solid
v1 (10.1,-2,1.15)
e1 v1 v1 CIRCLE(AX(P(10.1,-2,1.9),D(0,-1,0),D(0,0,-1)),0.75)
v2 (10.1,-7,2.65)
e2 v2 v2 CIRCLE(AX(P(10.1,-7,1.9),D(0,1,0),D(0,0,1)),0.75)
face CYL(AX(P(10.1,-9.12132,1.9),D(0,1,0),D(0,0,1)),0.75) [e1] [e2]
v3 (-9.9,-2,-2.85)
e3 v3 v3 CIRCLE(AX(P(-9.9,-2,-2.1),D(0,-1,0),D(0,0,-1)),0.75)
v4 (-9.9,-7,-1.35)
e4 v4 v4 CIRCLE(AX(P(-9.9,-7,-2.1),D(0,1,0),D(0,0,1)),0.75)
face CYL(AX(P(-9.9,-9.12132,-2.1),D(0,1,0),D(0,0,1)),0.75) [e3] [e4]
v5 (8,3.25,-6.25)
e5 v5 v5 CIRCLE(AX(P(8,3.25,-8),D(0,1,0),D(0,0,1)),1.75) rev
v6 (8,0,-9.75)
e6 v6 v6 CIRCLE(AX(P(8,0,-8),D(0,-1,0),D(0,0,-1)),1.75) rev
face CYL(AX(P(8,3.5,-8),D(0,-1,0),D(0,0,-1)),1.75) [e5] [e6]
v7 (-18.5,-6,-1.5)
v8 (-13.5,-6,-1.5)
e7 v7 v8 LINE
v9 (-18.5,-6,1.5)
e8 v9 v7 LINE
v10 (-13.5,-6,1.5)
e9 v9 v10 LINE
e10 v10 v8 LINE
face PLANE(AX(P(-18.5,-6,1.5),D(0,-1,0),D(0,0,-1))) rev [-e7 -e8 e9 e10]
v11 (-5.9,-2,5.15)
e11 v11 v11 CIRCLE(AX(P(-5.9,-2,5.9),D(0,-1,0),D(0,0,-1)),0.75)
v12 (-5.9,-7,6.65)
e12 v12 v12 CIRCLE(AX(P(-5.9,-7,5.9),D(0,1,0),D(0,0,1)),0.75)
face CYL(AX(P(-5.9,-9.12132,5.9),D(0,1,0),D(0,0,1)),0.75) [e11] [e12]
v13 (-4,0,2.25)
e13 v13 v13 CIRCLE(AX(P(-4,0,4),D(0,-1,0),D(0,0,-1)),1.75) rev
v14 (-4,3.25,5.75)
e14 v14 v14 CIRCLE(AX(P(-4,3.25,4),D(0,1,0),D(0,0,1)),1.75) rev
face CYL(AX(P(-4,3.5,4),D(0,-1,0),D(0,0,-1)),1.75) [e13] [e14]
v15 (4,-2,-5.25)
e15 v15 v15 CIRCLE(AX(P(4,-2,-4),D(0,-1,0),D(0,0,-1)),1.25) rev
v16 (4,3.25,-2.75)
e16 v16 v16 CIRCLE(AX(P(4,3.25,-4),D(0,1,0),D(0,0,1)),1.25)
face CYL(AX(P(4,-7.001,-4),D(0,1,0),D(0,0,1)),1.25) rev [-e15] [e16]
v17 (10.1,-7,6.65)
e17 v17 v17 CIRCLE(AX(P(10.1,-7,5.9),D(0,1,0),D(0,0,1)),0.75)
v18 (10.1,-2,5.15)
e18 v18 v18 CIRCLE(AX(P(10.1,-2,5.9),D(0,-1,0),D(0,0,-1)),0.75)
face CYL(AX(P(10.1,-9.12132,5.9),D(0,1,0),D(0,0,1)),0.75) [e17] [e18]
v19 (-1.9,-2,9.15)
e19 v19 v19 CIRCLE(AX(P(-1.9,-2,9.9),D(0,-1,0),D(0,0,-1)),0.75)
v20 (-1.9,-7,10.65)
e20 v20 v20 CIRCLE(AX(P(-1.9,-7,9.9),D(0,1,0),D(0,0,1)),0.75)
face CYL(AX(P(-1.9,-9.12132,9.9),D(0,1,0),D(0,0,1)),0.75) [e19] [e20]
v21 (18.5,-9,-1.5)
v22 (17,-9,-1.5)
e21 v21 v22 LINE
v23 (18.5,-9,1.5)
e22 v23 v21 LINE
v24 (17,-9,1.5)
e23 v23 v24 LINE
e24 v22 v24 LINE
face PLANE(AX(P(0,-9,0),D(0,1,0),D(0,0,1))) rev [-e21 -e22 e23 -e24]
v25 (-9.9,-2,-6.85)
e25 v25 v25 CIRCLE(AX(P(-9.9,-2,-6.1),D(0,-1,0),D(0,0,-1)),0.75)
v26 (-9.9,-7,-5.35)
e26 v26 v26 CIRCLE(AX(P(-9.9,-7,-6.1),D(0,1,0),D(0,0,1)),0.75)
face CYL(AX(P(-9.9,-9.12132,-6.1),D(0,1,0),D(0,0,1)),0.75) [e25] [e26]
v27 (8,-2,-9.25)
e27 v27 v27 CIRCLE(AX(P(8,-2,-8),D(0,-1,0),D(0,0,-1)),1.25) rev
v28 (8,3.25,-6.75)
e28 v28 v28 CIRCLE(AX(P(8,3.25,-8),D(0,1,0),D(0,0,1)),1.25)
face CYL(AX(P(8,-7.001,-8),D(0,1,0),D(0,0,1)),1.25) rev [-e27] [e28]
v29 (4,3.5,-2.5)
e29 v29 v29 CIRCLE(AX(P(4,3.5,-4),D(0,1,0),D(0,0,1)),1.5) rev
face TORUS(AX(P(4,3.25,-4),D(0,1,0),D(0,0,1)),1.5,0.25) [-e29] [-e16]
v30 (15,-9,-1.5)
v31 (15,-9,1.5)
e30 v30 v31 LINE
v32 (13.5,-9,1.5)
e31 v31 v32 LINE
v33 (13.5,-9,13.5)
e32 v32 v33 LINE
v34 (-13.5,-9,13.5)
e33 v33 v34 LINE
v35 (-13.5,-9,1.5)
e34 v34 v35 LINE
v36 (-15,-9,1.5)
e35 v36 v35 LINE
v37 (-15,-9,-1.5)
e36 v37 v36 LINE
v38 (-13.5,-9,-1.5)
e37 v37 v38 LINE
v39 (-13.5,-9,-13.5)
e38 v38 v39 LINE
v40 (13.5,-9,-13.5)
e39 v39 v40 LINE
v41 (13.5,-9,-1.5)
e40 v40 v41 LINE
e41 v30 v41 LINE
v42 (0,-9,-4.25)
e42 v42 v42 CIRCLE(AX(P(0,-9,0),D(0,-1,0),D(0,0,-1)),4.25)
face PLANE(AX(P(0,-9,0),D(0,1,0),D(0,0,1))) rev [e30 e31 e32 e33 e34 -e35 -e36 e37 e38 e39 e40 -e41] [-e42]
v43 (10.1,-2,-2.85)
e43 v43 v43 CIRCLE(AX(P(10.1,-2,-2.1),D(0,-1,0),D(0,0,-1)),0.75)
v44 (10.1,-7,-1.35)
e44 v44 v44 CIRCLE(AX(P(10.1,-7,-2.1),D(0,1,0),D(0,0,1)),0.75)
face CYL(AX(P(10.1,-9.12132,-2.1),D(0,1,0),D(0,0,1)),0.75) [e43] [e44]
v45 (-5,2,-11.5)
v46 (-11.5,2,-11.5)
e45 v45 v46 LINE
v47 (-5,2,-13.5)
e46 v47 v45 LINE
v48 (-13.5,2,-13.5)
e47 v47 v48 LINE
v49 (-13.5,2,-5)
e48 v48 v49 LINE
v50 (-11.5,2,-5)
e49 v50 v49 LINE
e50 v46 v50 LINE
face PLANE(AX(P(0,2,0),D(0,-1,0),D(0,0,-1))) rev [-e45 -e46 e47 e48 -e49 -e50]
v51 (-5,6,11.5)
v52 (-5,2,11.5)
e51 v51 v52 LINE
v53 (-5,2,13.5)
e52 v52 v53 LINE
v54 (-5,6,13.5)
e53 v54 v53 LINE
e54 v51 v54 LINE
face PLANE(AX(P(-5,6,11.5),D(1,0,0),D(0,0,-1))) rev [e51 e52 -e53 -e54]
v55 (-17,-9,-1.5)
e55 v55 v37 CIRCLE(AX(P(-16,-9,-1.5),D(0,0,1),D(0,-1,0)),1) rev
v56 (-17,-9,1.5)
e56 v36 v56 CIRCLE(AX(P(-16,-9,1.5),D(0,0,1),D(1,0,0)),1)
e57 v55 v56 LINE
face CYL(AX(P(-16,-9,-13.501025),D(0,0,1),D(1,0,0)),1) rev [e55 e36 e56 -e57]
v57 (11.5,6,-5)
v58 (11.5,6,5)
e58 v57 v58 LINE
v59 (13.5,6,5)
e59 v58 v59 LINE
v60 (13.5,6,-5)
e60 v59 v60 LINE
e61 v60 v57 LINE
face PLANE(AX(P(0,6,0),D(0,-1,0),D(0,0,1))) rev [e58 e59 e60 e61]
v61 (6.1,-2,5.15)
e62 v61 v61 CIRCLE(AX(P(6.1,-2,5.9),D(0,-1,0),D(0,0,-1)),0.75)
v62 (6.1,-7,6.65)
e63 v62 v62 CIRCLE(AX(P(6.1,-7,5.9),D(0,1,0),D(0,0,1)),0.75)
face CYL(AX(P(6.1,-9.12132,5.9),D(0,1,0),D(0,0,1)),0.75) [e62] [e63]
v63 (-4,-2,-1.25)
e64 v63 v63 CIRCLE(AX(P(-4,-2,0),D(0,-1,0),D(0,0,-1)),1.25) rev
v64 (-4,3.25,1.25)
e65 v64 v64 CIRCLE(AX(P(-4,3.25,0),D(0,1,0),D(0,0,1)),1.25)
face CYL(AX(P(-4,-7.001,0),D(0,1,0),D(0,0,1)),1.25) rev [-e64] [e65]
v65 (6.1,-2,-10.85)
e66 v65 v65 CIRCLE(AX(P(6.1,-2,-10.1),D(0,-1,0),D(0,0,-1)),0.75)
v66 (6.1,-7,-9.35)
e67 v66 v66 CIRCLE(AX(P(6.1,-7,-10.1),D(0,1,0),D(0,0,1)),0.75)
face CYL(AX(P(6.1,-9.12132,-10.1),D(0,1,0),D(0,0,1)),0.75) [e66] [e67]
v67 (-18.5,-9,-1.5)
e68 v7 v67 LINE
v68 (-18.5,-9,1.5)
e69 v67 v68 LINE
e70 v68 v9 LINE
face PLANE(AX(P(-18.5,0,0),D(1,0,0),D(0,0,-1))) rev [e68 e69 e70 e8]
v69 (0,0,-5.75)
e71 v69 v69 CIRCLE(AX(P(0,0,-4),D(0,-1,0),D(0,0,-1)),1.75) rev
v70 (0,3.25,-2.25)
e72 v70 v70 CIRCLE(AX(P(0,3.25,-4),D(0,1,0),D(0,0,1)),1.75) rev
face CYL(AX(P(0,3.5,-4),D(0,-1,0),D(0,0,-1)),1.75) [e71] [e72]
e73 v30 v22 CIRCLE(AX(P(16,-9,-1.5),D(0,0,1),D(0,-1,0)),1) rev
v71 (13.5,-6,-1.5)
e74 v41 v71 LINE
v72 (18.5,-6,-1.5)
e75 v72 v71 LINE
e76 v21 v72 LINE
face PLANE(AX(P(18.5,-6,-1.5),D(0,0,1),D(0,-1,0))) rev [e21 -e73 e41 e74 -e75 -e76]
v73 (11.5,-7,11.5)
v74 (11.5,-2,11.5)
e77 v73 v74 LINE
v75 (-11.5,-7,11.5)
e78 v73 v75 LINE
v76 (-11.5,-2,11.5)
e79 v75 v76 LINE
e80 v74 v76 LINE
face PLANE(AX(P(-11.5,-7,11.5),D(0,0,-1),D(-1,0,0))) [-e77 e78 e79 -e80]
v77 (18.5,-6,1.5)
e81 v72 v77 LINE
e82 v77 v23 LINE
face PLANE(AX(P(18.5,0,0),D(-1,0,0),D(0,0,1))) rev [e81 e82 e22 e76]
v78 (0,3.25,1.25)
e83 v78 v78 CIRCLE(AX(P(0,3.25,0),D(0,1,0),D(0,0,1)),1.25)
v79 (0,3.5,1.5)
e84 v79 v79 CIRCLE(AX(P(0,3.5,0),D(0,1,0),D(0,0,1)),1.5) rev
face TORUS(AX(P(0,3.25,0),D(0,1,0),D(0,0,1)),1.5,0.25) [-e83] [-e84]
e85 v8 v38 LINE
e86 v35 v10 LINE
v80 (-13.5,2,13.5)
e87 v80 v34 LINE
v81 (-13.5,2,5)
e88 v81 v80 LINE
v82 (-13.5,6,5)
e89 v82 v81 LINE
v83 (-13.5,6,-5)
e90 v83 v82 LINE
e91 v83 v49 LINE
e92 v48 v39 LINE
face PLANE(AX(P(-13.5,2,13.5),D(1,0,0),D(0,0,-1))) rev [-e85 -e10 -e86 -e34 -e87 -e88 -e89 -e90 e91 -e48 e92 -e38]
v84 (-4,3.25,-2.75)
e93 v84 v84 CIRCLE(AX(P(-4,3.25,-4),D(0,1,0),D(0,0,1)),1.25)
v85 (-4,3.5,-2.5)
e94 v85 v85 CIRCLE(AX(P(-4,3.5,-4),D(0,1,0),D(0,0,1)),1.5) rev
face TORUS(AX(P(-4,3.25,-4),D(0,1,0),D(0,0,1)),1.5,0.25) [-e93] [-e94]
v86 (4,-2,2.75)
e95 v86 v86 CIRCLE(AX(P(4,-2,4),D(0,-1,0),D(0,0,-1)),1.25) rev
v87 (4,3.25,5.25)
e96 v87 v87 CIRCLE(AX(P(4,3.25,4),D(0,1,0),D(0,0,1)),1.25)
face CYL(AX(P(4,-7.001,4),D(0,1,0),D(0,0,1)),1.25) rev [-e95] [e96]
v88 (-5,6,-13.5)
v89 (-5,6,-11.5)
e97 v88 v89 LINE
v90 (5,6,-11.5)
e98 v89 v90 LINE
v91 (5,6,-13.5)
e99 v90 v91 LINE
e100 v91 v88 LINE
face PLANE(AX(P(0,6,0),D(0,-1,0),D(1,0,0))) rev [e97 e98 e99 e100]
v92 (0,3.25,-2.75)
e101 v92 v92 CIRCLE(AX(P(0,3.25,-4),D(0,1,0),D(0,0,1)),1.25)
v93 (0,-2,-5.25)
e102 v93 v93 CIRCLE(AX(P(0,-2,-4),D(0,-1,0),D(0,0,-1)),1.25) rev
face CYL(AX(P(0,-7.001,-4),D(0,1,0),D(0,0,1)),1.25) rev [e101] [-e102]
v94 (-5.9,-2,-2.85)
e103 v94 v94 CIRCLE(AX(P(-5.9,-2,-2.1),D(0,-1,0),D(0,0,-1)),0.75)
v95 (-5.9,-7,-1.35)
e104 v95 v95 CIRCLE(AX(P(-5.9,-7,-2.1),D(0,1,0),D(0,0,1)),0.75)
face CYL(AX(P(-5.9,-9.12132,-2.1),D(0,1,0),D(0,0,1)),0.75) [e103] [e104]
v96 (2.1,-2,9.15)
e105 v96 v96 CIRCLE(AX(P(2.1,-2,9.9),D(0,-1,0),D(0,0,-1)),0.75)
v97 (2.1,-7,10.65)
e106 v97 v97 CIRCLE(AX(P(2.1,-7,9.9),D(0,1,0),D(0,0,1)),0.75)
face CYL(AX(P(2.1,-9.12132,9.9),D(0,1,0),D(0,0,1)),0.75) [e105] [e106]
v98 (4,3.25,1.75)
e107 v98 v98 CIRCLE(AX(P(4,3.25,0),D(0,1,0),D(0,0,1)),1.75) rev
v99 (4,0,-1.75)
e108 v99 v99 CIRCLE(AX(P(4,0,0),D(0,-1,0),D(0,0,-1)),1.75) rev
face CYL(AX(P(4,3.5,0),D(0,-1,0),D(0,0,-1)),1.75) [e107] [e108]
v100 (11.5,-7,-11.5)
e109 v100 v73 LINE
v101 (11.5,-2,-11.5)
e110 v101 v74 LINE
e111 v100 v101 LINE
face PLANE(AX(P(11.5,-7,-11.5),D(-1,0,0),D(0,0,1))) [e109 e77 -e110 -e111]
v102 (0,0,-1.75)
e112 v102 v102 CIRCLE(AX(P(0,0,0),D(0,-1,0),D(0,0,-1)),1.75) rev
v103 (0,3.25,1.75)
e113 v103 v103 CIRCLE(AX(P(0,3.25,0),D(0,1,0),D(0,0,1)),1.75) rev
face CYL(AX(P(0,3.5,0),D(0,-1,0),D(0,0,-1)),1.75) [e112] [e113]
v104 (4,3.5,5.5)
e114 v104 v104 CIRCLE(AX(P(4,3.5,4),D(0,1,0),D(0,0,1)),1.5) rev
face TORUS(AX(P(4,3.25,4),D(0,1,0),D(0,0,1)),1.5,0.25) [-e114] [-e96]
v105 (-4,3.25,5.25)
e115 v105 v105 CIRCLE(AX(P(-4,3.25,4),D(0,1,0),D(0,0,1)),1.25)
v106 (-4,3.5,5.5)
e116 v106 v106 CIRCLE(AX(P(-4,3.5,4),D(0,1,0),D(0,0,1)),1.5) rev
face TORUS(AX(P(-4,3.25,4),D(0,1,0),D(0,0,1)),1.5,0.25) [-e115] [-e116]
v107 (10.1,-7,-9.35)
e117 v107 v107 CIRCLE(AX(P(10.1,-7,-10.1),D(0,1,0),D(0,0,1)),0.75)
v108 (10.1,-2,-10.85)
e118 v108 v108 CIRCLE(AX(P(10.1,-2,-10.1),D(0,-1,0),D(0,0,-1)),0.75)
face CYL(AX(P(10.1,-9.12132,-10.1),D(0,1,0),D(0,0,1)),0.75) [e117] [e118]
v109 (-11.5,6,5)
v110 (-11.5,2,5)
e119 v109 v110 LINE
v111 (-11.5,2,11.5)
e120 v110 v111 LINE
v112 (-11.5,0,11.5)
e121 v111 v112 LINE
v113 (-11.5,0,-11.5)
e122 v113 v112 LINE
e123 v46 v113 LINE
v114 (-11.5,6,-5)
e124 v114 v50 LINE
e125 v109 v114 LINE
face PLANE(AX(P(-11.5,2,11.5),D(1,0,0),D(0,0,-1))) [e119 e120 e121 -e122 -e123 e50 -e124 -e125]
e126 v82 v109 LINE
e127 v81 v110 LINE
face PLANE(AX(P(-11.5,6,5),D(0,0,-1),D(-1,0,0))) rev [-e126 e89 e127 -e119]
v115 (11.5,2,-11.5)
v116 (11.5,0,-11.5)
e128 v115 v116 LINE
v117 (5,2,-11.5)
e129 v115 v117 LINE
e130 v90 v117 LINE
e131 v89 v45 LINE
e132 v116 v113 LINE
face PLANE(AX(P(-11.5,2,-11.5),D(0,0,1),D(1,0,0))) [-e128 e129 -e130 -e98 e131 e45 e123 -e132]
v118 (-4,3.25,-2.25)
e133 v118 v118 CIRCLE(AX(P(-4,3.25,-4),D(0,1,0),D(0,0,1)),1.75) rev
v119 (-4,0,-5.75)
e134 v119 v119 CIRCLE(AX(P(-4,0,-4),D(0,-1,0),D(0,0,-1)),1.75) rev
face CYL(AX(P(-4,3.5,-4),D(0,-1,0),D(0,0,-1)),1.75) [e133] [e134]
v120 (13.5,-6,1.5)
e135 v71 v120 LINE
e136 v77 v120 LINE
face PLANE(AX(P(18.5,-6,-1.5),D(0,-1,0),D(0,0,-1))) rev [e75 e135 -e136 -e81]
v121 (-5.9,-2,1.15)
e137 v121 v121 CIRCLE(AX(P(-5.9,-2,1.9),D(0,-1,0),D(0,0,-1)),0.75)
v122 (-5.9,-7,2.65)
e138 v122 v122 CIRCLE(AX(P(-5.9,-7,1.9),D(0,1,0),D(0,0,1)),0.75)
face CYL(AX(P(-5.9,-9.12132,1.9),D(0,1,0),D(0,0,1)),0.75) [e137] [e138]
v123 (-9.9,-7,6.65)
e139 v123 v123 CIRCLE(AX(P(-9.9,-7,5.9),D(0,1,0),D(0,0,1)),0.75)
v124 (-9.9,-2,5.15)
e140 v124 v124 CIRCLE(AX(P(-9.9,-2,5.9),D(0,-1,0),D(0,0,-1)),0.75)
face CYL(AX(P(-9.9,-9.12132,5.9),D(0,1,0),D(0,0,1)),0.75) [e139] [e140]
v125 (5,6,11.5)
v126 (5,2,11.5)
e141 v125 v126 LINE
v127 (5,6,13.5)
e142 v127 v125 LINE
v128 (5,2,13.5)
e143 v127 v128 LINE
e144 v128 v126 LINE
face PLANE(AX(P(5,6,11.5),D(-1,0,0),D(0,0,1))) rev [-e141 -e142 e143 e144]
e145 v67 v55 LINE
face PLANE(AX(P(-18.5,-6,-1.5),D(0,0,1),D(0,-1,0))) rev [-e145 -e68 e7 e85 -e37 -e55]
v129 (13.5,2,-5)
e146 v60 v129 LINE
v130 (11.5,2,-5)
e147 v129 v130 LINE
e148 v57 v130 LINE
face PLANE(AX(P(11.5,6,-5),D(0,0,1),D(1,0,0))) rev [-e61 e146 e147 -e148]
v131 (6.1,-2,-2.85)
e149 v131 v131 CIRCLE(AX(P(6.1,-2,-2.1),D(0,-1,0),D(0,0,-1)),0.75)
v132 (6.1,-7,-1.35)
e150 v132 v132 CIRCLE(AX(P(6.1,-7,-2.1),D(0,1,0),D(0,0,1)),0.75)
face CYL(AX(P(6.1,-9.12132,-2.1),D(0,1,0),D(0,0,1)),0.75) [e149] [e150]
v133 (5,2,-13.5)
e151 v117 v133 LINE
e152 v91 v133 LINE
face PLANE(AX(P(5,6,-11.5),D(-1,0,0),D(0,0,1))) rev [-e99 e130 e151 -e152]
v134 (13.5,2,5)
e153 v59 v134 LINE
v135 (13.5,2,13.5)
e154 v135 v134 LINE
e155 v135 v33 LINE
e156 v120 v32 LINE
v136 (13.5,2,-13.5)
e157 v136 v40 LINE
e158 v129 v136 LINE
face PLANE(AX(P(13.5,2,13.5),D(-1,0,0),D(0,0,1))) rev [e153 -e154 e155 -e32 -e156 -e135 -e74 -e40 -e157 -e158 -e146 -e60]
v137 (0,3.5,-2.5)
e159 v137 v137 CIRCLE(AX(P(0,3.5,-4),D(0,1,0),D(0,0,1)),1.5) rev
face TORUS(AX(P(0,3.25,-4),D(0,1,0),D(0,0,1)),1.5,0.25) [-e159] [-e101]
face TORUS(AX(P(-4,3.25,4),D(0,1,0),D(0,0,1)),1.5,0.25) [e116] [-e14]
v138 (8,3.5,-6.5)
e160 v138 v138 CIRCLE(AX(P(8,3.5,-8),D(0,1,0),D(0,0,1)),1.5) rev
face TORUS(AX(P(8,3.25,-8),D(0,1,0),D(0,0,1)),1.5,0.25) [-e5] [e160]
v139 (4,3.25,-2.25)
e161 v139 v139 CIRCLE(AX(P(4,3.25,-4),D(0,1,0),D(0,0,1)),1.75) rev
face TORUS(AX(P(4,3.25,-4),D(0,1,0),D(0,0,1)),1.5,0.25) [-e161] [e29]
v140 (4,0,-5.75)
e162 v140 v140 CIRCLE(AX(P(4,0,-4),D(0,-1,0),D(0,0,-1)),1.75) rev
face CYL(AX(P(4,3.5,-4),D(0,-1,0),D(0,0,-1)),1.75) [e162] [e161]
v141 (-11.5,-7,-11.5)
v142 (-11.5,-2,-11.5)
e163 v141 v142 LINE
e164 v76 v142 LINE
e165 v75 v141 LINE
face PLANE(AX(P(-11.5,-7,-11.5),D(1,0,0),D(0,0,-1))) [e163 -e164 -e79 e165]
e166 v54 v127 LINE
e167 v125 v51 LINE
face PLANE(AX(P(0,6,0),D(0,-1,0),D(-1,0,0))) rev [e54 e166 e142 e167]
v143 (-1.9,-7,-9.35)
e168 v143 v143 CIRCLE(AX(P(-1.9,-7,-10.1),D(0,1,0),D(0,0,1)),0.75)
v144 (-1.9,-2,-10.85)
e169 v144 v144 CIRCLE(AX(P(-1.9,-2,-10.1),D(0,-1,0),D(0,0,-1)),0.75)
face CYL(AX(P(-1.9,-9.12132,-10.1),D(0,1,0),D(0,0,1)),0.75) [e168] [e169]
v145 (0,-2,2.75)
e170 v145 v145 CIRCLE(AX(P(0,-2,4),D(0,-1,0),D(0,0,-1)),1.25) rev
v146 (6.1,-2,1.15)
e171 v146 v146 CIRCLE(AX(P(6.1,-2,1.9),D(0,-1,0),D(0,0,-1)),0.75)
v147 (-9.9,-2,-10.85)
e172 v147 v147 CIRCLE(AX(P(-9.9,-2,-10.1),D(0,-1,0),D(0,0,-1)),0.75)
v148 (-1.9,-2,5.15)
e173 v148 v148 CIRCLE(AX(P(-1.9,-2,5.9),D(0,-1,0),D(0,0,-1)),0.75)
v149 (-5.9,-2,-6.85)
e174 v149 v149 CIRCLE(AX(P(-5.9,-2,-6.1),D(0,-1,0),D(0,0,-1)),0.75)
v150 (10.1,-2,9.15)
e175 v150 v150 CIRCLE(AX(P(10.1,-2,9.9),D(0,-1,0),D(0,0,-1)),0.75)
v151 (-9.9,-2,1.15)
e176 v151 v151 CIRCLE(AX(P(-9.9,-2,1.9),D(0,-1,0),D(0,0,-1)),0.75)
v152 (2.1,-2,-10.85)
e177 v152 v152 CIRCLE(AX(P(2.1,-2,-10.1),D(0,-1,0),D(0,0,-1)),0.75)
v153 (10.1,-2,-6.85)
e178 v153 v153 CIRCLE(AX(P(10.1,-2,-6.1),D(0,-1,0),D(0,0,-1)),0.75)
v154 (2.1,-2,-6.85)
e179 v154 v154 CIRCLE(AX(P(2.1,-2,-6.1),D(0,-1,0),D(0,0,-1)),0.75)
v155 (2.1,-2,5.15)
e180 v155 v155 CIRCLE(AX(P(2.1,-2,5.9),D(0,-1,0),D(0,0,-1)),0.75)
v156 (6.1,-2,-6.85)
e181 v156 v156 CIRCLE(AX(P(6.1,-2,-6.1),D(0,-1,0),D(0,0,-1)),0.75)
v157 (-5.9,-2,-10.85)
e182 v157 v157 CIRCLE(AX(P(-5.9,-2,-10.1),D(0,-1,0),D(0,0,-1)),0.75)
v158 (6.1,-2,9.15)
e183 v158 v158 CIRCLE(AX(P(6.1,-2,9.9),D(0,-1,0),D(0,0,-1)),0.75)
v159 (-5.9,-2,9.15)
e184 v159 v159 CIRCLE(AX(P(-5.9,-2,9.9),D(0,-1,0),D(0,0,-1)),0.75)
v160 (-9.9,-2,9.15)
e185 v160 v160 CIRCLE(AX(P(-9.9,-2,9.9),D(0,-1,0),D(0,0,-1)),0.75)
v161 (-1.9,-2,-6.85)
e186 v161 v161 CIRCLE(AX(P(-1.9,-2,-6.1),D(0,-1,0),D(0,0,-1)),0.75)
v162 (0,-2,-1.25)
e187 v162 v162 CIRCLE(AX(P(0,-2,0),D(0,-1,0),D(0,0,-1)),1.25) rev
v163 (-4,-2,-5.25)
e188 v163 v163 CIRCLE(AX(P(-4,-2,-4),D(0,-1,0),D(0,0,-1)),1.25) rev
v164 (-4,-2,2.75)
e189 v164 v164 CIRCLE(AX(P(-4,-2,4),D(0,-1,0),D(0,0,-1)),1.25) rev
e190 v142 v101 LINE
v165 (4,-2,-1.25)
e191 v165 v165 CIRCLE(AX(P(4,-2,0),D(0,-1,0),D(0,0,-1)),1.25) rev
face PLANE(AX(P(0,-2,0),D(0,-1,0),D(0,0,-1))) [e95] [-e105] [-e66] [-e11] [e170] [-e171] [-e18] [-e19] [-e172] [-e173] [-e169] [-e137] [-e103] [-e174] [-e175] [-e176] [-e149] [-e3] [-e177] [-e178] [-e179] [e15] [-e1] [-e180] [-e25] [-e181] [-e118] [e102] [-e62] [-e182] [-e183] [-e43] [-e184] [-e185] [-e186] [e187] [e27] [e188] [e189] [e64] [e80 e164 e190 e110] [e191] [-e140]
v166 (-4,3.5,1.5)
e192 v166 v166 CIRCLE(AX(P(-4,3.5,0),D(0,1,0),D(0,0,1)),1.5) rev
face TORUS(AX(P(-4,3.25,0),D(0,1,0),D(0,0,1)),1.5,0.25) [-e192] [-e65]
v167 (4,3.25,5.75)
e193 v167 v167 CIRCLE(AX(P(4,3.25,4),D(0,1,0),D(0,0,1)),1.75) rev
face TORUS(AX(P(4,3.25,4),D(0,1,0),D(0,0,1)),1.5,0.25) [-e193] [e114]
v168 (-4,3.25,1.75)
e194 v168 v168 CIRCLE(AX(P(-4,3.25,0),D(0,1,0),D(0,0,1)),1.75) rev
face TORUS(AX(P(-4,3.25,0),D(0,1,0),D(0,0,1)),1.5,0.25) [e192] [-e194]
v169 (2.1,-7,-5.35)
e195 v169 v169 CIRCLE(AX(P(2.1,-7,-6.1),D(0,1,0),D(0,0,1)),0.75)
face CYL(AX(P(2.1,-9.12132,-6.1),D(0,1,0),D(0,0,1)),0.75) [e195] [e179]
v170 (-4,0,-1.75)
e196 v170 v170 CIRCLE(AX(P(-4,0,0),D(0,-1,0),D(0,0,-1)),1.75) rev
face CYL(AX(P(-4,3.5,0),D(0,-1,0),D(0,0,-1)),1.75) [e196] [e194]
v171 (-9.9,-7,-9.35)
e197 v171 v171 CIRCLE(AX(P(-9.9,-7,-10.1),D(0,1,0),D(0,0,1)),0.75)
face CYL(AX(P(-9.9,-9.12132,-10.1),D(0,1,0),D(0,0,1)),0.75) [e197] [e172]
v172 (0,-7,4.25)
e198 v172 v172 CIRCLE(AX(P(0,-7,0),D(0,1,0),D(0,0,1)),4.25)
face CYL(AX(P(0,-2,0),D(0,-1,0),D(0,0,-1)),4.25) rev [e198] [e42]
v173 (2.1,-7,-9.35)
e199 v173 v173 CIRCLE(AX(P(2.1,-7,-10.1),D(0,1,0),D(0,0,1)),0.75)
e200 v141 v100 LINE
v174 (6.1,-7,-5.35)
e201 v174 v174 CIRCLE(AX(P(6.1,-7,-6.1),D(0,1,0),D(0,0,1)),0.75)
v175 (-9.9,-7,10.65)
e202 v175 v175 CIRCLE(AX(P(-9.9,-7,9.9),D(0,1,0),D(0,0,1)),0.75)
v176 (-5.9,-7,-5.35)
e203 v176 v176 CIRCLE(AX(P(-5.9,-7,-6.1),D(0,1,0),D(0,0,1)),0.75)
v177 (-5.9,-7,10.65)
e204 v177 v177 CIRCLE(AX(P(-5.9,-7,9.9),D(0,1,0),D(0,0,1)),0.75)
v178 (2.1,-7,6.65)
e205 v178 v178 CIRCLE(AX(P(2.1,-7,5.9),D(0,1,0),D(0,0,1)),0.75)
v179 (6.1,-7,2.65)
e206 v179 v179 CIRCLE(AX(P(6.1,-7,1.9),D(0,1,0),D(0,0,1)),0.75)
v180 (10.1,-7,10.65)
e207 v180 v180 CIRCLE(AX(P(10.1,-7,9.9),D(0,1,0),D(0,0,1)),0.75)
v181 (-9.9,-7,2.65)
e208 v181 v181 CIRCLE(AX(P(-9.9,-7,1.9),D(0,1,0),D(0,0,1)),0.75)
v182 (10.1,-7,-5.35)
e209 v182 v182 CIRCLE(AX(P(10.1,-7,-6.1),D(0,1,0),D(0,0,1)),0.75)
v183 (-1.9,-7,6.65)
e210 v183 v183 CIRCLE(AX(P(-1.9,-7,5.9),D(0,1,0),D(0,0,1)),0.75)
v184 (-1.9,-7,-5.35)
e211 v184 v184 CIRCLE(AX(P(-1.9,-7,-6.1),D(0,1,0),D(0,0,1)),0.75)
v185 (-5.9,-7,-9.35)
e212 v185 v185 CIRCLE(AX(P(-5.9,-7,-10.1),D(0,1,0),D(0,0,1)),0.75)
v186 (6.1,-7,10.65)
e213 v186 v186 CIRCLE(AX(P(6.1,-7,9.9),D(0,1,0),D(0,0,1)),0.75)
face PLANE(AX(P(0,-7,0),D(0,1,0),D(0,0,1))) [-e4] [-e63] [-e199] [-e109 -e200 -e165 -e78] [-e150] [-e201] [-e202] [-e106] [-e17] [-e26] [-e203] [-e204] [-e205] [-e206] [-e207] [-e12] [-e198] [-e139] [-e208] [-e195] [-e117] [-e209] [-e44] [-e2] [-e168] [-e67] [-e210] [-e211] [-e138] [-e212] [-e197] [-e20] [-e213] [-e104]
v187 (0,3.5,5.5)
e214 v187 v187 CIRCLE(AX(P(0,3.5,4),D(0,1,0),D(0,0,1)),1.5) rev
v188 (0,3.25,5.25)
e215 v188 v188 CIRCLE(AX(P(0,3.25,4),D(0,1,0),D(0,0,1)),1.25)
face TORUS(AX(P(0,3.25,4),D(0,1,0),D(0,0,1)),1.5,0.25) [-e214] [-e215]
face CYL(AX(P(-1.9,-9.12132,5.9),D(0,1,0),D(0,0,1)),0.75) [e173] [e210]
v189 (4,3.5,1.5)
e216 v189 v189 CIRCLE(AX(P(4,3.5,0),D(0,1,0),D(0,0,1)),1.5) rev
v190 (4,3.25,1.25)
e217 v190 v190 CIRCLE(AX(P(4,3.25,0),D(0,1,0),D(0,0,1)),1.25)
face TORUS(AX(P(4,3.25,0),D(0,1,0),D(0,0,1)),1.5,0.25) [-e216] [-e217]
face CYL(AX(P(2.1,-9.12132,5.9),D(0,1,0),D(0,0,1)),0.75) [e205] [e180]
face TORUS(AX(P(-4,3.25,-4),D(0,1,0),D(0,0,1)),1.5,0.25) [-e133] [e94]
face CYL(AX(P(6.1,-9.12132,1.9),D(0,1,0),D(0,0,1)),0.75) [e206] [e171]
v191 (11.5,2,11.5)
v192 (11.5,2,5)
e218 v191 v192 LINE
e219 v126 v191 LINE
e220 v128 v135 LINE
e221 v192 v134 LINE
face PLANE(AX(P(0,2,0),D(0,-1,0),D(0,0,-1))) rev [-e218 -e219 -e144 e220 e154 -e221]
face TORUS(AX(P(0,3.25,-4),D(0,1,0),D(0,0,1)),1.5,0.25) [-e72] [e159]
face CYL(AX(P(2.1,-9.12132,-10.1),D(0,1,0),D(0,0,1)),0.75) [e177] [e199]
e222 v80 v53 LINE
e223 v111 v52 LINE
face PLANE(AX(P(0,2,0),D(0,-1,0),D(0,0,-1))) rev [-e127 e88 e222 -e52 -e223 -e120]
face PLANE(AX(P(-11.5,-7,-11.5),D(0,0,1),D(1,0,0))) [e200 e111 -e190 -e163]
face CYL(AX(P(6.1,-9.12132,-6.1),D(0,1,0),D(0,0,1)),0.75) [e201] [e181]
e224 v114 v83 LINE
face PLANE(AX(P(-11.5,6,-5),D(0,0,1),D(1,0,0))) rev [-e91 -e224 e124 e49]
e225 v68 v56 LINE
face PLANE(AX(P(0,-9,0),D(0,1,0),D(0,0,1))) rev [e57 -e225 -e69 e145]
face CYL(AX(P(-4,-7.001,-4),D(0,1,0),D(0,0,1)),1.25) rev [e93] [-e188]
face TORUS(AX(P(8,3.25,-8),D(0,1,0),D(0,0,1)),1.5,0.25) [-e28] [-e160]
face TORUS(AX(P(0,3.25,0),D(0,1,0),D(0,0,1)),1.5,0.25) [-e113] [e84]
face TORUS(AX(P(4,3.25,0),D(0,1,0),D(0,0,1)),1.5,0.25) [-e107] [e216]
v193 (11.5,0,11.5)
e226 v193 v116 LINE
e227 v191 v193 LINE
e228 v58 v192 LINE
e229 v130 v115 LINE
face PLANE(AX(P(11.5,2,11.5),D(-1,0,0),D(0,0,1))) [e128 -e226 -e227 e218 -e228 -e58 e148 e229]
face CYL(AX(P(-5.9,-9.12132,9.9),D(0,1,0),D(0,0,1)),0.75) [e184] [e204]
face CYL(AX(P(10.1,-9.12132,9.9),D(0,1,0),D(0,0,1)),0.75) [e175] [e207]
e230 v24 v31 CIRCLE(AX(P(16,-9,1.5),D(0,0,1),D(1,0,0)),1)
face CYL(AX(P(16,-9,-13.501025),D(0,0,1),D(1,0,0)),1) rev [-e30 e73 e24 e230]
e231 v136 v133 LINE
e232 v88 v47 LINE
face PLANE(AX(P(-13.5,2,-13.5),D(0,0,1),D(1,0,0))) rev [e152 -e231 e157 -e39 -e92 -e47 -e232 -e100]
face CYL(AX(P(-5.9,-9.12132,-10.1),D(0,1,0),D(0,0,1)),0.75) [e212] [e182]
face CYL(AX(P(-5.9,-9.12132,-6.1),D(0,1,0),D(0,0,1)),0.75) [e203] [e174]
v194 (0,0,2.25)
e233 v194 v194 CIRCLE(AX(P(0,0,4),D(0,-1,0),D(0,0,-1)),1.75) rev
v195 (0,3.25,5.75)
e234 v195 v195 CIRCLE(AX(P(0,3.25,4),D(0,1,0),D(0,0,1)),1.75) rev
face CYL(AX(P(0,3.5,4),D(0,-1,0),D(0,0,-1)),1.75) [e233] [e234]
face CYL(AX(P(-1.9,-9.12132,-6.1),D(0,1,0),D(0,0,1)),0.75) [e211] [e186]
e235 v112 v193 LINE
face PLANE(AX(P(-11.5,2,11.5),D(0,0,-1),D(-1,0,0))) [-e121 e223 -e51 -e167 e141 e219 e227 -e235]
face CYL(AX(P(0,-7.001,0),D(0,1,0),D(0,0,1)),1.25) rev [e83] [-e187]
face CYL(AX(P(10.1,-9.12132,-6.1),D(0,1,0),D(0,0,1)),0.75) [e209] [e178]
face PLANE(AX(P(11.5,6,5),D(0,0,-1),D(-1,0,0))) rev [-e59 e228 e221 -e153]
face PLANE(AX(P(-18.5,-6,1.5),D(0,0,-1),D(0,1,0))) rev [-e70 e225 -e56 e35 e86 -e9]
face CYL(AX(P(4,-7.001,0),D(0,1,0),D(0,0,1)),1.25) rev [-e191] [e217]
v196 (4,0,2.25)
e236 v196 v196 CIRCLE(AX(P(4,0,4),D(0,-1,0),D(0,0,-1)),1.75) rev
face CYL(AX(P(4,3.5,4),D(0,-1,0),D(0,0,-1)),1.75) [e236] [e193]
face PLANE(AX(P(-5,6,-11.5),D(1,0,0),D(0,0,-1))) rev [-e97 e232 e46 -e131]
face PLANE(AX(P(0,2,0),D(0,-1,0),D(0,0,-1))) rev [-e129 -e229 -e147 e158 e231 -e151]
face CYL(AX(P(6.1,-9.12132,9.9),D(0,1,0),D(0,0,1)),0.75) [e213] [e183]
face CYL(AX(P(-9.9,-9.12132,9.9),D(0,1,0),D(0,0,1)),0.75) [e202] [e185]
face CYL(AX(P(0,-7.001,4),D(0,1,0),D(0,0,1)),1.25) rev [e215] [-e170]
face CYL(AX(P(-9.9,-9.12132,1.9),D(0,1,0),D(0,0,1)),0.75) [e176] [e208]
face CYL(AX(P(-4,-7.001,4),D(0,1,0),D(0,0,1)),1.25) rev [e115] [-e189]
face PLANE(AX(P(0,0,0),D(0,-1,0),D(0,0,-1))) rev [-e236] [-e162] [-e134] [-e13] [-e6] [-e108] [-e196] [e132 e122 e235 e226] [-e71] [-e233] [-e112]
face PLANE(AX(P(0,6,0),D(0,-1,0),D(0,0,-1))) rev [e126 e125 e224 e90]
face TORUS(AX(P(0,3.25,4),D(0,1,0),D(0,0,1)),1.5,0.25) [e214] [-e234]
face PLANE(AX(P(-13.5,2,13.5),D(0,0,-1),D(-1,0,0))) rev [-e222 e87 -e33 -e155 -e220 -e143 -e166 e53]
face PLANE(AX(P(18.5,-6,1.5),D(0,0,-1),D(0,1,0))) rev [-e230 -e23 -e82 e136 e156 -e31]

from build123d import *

# Parameters (mm, degrees)
SKETCH1_W              = 27
SKETCH1_H              = 27
SKETCH1_W_2            = 23
SKETCH1_H_2            = 23
BOSS_EXTRUDE1_DEPTH    = 2
SKETCH2_W              = 27
SKETCH2_H              = 27
BOSS_EXTRUDE2_DEPTH    = 2
SKETCH3_W              = 27
SKETCH3_H              = 27
SKETCH3_W_2            = 23
SKETCH3_H_2            = 23
BOSS_EXTRUDE3_DEPTH    = 5
SKETCH6_R              = 1.75
BOSS_EXTRUDE5_DEPTH    = 3.5
CUT_EXTRUDE2_REACH     = 23.789
SKETCH7_R              = 1.25
FILLET1_R              = 0.25
LPATTERN3_COUNT        = 5
LPATTERN3_PITCH        = 4
LPATTERN3_COUNT_DIR2   = 5
LPATTERN3_PITCH_DIR2   = 4
FILLET1_OF_LPATTERN3_R = 0.25
SKETCH11_R             = 0.75
BOSS_EXTRUDE8_DEPTH    = 5
LPATTERN2_COUNT        = 6
LPATTERN2_PITCH        = 4
LPATTERN2_COUNT_DIR2   = 6
LPATTERN2_PITCH_DIR2   = 4
SKETCH8_W              = 27
SKETCH8_H              = 27
BOSS_EXTRUDE6_DEPTH    = 2
SKETCH9_R              = 4.25
CUT_EXTRUDE3_DEPTH     = 7
SKETCH10_W             = 2
SKETCH10_H             = 10
BOSS_EXTRUDE7_DEPTH    = 4
CIRPATTERN2_COUNT      = 4
SKETCH12_W             = 3
SKETCH12_H             = 3
BOSS_EXTRUDE9_DEPTH    = 5
CIRPATTERN1_COUNT      = 2
CUT_EXTRUDE4_REACH     = 27.461


with BuildPart() as part:
    # Sketch1 → Boss-Extrude1 (new body)
    with BuildSketch(Plane(origin=(0, 0, 0), x_dir=(1, 0, 0), z_dir=(0, 1, 0))):
        Rectangle(SKETCH1_W, SKETCH1_H)
        Rectangle(SKETCH1_W_2, SKETCH1_H_2, mode=Mode.SUBTRACT)
    extrude(amount=BOSS_EXTRUDE1_DEPTH)

    # Sketch2 → Boss-Extrude2 (add)
    with BuildSketch(Plane.XZ):
        Rectangle(SKETCH2_W, SKETCH2_H)
    extrude(amount=BOSS_EXTRUDE2_DEPTH)

    # Sketch3 → Boss-Extrude3 (add)
    with BuildSketch(Plane.XZ.offset(2)):
        Rectangle(SKETCH3_W, SKETCH3_H)
        Rectangle(SKETCH3_W_2, SKETCH3_H_2, mode=Mode.SUBTRACT)
    extrude(amount=BOSS_EXTRUDE3_DEPTH)

    # Sketch6 → Boss-Extrude5 (add)
    with BuildSketch(Plane(origin=(0, 0, 0), x_dir=(1, 0, 0), z_dir=(0, 1, 0))):
        with Locations(Location((8, 8, 0), (0, 0, 90))):
            Circle(SKETCH6_R)
    boss_extrude5 = extrude(amount=BOSS_EXTRUDE5_DEPTH)

    # Sketch7 → Cut-Extrude2 (cut, up to next)
    with BuildSketch(Plane(origin=(0, 3.5, 0), x_dir=(1, 0, 0), z_dir=(0, 1, 0)), mode=Mode.PRIVATE) as cut_extrude2_sk1:
        with Locations(Location((8, 8, 0), (0, 0, 270))):
            Circle(SKETCH7_R)
    cut_extrude2_tool1 = extrude(cut_extrude2_sk1.sketch, amount=-CUT_EXTRUDE2_REACH, mode=Mode.PRIVATE) & part.part
    cut_extrude2 = cut_extrude2_tool1.solids().sort_by_distance((8, 3.5, -8))[0]
    add(cut_extrude2, mode=Mode.SUBTRACT)

    # Fillet1
    fillet1_edges = [part.edges().sort_by_distance(p)[0] for p in [
        (8, 3.5, -6.25),
        (8, 3.5, -9.25),
    ]]
    fillet(fillet1_edges, radius=FILLET1_R - 0.0001)  # a hair under: the kernel refuses the full size

    # LPattern3: Boss-Extrude5, Cut-Extrude2 5 × 5, 15 skipped
    with Locations(*[(-j * LPATTERN3_PITCH_DIR2, 0, i * LPATTERN3_PITCH) for i in range(LPATTERN3_COUNT) for j in range(LPATTERN3_COUNT_DIR2) if (i, j) not in ((0, 0), (0, 1), (0, 2), (0, 3), (0, 4), (1, 0), (1, 4), (2, 0), (2, 4), (3, 0), (3, 4), (4, 0), (4, 1), (4, 2), (4, 3), (4, 4))]):
        add(boss_extrude5)
        add(cut_extrude2, mode=Mode.SUBTRACT)

    # Fillet1 of LPattern3
    fillet1_of_lpattern3_edges = [part.edges().sort_by_distance(p)[0] for p in [
        (4, 3.5, -2.25),
        (4, 3.5, -5.25),
        (0, 3.5, -2.25),
        (0, 3.5, -5.25),
        (-4, 3.5, -2.25),
        (-4, 3.5, -5.25),
        (4, 3.5, 1.75),
        (4, 3.5, -1.25),
        (0, 3.5, 1.75),
        (0, 3.5, -1.25),
        (-4, 3.5, 1.75),
        (-4, 3.5, -1.25),
        (4, 3.5, 5.75),
        (4, 3.5, 2.75),
        (0, 3.5, 5.75),
        (0, 3.5, 2.75),
        (-4, 3.5, 5.75),
        (-4, 3.5, 2.75),
    ]]
    fillet(fillet1_of_lpattern3_edges, radius=FILLET1_OF_LPATTERN3_R - 0.0001)  # a hair under: the kernel refuses the full size

    # Sketch11 → Boss-Extrude8 (add)
    with BuildSketch(Plane.XZ.offset(2)):
        with Locations(Location((-9.9, 9.9, 0), (0, 0, 90))):
            Circle(SKETCH11_R)
    boss_extrude8 = extrude(amount=BOSS_EXTRUDE8_DEPTH)

    # LPattern2: Boss-Extrude8 6 × 6
    with Locations(*[(i * LPATTERN2_PITCH, 0, -j * LPATTERN2_PITCH_DIR2) for i in range(LPATTERN2_COUNT) for j in range(LPATTERN2_COUNT_DIR2) if (i, j) != (0, 0)]):
        add(boss_extrude8)

    # Sketch8 → Boss-Extrude6 (add)
    with BuildSketch(Plane.XZ.offset(7)):
        Rectangle(SKETCH8_W, SKETCH8_H)
    extrude(amount=BOSS_EXTRUDE6_DEPTH)

    # Sketch9 → Cut-Extrude3 (cut)
    with BuildSketch(Plane.XZ.offset(9)):
        with Locations(Location((0, 0, 0), (0, 0, 270))):
            Circle(SKETCH9_R)
    extrude(amount=-CUT_EXTRUDE3_DEPTH, mode=Mode.SUBTRACT)

    # Sketch10 → Boss-Extrude7 (add)
    with BuildSketch(Plane(origin=(0, 2, 0), x_dir=(1, 0, 0), z_dir=(0, 1, 0))):
        with Locations((-12.5, 0)):
            Rectangle(SKETCH10_W, SKETCH10_H)
    boss_extrude7 = extrude(amount=BOSS_EXTRUDE7_DEPTH)

    # CirPattern2: Boss-Extrude7 ×4 about axis
    cirpattern2_axis = Axis((0, 0, 0), (0, 1, 0))
    for i in range(1, CIRPATTERN2_COUNT):
        add(boss_extrude7.rotate(cirpattern2_axis, i * 360 / CIRPATTERN2_COUNT))

    # Sketch12 → Boss-Extrude9 (add)
    with BuildSketch(Plane.ZY.offset(13.5)):
        with Locations((0, -7.5)):
            Rectangle(SKETCH12_W, SKETCH12_H)
    boss_extrude9 = extrude(amount=BOSS_EXTRUDE9_DEPTH)

    # CirPattern1: Boss-Extrude9 ×2 about axis
    cirpattern1_axis = Axis((0, 0, 0), (0, 1, 0))
    for i in range(1, CIRPATTERN1_COUNT):
        add(boss_extrude9.rotate(cirpattern1_axis, i * 360 / CIRPATTERN1_COUNT))

    # Sketch13 → Cut-Extrude4 (cut, up to next)
    with BuildSketch(Plane.XY.offset(1.5), mode=Mode.PRIVATE) as cut_extrude4_sk1:
        with BuildLine():
            Line((15, -9), (17, -9))
            ThreePointArc((17, -9), (16, -8), (15, -9))
        make_face()
    cut_extrude4_tool1 = extrude(cut_extrude4_sk1.sketch, amount=-CUT_EXTRUDE4_REACH, mode=Mode.PRIVATE) & part.part
    # Sketch13 → Cut-Extrude4 (cut, up to next)
    with BuildSketch(Plane.XY.offset(1.5), mode=Mode.PRIVATE) as cut_extrude4_sk2:
        with BuildLine():
            Line((-17, -9), (-15, -9))
            ThreePointArc((-15, -9), (-16, -8), (-17, -9))
        make_face()
    cut_extrude4_tool2 = extrude(cut_extrude4_sk2.sketch, amount=-CUT_EXTRUDE4_REACH, mode=Mode.PRIVATE) & part.part
    add(cut_extrude4_tool1.solids().sort_by_distance((16, -8.575587, 1.5))[0], mode=Mode.SUBTRACT)
    add(cut_extrude4_tool2.solids().sort_by_distance((-16, -8.575587, 1.5))[0], mode=Mode.SUBTRACT)


solid = part.part
